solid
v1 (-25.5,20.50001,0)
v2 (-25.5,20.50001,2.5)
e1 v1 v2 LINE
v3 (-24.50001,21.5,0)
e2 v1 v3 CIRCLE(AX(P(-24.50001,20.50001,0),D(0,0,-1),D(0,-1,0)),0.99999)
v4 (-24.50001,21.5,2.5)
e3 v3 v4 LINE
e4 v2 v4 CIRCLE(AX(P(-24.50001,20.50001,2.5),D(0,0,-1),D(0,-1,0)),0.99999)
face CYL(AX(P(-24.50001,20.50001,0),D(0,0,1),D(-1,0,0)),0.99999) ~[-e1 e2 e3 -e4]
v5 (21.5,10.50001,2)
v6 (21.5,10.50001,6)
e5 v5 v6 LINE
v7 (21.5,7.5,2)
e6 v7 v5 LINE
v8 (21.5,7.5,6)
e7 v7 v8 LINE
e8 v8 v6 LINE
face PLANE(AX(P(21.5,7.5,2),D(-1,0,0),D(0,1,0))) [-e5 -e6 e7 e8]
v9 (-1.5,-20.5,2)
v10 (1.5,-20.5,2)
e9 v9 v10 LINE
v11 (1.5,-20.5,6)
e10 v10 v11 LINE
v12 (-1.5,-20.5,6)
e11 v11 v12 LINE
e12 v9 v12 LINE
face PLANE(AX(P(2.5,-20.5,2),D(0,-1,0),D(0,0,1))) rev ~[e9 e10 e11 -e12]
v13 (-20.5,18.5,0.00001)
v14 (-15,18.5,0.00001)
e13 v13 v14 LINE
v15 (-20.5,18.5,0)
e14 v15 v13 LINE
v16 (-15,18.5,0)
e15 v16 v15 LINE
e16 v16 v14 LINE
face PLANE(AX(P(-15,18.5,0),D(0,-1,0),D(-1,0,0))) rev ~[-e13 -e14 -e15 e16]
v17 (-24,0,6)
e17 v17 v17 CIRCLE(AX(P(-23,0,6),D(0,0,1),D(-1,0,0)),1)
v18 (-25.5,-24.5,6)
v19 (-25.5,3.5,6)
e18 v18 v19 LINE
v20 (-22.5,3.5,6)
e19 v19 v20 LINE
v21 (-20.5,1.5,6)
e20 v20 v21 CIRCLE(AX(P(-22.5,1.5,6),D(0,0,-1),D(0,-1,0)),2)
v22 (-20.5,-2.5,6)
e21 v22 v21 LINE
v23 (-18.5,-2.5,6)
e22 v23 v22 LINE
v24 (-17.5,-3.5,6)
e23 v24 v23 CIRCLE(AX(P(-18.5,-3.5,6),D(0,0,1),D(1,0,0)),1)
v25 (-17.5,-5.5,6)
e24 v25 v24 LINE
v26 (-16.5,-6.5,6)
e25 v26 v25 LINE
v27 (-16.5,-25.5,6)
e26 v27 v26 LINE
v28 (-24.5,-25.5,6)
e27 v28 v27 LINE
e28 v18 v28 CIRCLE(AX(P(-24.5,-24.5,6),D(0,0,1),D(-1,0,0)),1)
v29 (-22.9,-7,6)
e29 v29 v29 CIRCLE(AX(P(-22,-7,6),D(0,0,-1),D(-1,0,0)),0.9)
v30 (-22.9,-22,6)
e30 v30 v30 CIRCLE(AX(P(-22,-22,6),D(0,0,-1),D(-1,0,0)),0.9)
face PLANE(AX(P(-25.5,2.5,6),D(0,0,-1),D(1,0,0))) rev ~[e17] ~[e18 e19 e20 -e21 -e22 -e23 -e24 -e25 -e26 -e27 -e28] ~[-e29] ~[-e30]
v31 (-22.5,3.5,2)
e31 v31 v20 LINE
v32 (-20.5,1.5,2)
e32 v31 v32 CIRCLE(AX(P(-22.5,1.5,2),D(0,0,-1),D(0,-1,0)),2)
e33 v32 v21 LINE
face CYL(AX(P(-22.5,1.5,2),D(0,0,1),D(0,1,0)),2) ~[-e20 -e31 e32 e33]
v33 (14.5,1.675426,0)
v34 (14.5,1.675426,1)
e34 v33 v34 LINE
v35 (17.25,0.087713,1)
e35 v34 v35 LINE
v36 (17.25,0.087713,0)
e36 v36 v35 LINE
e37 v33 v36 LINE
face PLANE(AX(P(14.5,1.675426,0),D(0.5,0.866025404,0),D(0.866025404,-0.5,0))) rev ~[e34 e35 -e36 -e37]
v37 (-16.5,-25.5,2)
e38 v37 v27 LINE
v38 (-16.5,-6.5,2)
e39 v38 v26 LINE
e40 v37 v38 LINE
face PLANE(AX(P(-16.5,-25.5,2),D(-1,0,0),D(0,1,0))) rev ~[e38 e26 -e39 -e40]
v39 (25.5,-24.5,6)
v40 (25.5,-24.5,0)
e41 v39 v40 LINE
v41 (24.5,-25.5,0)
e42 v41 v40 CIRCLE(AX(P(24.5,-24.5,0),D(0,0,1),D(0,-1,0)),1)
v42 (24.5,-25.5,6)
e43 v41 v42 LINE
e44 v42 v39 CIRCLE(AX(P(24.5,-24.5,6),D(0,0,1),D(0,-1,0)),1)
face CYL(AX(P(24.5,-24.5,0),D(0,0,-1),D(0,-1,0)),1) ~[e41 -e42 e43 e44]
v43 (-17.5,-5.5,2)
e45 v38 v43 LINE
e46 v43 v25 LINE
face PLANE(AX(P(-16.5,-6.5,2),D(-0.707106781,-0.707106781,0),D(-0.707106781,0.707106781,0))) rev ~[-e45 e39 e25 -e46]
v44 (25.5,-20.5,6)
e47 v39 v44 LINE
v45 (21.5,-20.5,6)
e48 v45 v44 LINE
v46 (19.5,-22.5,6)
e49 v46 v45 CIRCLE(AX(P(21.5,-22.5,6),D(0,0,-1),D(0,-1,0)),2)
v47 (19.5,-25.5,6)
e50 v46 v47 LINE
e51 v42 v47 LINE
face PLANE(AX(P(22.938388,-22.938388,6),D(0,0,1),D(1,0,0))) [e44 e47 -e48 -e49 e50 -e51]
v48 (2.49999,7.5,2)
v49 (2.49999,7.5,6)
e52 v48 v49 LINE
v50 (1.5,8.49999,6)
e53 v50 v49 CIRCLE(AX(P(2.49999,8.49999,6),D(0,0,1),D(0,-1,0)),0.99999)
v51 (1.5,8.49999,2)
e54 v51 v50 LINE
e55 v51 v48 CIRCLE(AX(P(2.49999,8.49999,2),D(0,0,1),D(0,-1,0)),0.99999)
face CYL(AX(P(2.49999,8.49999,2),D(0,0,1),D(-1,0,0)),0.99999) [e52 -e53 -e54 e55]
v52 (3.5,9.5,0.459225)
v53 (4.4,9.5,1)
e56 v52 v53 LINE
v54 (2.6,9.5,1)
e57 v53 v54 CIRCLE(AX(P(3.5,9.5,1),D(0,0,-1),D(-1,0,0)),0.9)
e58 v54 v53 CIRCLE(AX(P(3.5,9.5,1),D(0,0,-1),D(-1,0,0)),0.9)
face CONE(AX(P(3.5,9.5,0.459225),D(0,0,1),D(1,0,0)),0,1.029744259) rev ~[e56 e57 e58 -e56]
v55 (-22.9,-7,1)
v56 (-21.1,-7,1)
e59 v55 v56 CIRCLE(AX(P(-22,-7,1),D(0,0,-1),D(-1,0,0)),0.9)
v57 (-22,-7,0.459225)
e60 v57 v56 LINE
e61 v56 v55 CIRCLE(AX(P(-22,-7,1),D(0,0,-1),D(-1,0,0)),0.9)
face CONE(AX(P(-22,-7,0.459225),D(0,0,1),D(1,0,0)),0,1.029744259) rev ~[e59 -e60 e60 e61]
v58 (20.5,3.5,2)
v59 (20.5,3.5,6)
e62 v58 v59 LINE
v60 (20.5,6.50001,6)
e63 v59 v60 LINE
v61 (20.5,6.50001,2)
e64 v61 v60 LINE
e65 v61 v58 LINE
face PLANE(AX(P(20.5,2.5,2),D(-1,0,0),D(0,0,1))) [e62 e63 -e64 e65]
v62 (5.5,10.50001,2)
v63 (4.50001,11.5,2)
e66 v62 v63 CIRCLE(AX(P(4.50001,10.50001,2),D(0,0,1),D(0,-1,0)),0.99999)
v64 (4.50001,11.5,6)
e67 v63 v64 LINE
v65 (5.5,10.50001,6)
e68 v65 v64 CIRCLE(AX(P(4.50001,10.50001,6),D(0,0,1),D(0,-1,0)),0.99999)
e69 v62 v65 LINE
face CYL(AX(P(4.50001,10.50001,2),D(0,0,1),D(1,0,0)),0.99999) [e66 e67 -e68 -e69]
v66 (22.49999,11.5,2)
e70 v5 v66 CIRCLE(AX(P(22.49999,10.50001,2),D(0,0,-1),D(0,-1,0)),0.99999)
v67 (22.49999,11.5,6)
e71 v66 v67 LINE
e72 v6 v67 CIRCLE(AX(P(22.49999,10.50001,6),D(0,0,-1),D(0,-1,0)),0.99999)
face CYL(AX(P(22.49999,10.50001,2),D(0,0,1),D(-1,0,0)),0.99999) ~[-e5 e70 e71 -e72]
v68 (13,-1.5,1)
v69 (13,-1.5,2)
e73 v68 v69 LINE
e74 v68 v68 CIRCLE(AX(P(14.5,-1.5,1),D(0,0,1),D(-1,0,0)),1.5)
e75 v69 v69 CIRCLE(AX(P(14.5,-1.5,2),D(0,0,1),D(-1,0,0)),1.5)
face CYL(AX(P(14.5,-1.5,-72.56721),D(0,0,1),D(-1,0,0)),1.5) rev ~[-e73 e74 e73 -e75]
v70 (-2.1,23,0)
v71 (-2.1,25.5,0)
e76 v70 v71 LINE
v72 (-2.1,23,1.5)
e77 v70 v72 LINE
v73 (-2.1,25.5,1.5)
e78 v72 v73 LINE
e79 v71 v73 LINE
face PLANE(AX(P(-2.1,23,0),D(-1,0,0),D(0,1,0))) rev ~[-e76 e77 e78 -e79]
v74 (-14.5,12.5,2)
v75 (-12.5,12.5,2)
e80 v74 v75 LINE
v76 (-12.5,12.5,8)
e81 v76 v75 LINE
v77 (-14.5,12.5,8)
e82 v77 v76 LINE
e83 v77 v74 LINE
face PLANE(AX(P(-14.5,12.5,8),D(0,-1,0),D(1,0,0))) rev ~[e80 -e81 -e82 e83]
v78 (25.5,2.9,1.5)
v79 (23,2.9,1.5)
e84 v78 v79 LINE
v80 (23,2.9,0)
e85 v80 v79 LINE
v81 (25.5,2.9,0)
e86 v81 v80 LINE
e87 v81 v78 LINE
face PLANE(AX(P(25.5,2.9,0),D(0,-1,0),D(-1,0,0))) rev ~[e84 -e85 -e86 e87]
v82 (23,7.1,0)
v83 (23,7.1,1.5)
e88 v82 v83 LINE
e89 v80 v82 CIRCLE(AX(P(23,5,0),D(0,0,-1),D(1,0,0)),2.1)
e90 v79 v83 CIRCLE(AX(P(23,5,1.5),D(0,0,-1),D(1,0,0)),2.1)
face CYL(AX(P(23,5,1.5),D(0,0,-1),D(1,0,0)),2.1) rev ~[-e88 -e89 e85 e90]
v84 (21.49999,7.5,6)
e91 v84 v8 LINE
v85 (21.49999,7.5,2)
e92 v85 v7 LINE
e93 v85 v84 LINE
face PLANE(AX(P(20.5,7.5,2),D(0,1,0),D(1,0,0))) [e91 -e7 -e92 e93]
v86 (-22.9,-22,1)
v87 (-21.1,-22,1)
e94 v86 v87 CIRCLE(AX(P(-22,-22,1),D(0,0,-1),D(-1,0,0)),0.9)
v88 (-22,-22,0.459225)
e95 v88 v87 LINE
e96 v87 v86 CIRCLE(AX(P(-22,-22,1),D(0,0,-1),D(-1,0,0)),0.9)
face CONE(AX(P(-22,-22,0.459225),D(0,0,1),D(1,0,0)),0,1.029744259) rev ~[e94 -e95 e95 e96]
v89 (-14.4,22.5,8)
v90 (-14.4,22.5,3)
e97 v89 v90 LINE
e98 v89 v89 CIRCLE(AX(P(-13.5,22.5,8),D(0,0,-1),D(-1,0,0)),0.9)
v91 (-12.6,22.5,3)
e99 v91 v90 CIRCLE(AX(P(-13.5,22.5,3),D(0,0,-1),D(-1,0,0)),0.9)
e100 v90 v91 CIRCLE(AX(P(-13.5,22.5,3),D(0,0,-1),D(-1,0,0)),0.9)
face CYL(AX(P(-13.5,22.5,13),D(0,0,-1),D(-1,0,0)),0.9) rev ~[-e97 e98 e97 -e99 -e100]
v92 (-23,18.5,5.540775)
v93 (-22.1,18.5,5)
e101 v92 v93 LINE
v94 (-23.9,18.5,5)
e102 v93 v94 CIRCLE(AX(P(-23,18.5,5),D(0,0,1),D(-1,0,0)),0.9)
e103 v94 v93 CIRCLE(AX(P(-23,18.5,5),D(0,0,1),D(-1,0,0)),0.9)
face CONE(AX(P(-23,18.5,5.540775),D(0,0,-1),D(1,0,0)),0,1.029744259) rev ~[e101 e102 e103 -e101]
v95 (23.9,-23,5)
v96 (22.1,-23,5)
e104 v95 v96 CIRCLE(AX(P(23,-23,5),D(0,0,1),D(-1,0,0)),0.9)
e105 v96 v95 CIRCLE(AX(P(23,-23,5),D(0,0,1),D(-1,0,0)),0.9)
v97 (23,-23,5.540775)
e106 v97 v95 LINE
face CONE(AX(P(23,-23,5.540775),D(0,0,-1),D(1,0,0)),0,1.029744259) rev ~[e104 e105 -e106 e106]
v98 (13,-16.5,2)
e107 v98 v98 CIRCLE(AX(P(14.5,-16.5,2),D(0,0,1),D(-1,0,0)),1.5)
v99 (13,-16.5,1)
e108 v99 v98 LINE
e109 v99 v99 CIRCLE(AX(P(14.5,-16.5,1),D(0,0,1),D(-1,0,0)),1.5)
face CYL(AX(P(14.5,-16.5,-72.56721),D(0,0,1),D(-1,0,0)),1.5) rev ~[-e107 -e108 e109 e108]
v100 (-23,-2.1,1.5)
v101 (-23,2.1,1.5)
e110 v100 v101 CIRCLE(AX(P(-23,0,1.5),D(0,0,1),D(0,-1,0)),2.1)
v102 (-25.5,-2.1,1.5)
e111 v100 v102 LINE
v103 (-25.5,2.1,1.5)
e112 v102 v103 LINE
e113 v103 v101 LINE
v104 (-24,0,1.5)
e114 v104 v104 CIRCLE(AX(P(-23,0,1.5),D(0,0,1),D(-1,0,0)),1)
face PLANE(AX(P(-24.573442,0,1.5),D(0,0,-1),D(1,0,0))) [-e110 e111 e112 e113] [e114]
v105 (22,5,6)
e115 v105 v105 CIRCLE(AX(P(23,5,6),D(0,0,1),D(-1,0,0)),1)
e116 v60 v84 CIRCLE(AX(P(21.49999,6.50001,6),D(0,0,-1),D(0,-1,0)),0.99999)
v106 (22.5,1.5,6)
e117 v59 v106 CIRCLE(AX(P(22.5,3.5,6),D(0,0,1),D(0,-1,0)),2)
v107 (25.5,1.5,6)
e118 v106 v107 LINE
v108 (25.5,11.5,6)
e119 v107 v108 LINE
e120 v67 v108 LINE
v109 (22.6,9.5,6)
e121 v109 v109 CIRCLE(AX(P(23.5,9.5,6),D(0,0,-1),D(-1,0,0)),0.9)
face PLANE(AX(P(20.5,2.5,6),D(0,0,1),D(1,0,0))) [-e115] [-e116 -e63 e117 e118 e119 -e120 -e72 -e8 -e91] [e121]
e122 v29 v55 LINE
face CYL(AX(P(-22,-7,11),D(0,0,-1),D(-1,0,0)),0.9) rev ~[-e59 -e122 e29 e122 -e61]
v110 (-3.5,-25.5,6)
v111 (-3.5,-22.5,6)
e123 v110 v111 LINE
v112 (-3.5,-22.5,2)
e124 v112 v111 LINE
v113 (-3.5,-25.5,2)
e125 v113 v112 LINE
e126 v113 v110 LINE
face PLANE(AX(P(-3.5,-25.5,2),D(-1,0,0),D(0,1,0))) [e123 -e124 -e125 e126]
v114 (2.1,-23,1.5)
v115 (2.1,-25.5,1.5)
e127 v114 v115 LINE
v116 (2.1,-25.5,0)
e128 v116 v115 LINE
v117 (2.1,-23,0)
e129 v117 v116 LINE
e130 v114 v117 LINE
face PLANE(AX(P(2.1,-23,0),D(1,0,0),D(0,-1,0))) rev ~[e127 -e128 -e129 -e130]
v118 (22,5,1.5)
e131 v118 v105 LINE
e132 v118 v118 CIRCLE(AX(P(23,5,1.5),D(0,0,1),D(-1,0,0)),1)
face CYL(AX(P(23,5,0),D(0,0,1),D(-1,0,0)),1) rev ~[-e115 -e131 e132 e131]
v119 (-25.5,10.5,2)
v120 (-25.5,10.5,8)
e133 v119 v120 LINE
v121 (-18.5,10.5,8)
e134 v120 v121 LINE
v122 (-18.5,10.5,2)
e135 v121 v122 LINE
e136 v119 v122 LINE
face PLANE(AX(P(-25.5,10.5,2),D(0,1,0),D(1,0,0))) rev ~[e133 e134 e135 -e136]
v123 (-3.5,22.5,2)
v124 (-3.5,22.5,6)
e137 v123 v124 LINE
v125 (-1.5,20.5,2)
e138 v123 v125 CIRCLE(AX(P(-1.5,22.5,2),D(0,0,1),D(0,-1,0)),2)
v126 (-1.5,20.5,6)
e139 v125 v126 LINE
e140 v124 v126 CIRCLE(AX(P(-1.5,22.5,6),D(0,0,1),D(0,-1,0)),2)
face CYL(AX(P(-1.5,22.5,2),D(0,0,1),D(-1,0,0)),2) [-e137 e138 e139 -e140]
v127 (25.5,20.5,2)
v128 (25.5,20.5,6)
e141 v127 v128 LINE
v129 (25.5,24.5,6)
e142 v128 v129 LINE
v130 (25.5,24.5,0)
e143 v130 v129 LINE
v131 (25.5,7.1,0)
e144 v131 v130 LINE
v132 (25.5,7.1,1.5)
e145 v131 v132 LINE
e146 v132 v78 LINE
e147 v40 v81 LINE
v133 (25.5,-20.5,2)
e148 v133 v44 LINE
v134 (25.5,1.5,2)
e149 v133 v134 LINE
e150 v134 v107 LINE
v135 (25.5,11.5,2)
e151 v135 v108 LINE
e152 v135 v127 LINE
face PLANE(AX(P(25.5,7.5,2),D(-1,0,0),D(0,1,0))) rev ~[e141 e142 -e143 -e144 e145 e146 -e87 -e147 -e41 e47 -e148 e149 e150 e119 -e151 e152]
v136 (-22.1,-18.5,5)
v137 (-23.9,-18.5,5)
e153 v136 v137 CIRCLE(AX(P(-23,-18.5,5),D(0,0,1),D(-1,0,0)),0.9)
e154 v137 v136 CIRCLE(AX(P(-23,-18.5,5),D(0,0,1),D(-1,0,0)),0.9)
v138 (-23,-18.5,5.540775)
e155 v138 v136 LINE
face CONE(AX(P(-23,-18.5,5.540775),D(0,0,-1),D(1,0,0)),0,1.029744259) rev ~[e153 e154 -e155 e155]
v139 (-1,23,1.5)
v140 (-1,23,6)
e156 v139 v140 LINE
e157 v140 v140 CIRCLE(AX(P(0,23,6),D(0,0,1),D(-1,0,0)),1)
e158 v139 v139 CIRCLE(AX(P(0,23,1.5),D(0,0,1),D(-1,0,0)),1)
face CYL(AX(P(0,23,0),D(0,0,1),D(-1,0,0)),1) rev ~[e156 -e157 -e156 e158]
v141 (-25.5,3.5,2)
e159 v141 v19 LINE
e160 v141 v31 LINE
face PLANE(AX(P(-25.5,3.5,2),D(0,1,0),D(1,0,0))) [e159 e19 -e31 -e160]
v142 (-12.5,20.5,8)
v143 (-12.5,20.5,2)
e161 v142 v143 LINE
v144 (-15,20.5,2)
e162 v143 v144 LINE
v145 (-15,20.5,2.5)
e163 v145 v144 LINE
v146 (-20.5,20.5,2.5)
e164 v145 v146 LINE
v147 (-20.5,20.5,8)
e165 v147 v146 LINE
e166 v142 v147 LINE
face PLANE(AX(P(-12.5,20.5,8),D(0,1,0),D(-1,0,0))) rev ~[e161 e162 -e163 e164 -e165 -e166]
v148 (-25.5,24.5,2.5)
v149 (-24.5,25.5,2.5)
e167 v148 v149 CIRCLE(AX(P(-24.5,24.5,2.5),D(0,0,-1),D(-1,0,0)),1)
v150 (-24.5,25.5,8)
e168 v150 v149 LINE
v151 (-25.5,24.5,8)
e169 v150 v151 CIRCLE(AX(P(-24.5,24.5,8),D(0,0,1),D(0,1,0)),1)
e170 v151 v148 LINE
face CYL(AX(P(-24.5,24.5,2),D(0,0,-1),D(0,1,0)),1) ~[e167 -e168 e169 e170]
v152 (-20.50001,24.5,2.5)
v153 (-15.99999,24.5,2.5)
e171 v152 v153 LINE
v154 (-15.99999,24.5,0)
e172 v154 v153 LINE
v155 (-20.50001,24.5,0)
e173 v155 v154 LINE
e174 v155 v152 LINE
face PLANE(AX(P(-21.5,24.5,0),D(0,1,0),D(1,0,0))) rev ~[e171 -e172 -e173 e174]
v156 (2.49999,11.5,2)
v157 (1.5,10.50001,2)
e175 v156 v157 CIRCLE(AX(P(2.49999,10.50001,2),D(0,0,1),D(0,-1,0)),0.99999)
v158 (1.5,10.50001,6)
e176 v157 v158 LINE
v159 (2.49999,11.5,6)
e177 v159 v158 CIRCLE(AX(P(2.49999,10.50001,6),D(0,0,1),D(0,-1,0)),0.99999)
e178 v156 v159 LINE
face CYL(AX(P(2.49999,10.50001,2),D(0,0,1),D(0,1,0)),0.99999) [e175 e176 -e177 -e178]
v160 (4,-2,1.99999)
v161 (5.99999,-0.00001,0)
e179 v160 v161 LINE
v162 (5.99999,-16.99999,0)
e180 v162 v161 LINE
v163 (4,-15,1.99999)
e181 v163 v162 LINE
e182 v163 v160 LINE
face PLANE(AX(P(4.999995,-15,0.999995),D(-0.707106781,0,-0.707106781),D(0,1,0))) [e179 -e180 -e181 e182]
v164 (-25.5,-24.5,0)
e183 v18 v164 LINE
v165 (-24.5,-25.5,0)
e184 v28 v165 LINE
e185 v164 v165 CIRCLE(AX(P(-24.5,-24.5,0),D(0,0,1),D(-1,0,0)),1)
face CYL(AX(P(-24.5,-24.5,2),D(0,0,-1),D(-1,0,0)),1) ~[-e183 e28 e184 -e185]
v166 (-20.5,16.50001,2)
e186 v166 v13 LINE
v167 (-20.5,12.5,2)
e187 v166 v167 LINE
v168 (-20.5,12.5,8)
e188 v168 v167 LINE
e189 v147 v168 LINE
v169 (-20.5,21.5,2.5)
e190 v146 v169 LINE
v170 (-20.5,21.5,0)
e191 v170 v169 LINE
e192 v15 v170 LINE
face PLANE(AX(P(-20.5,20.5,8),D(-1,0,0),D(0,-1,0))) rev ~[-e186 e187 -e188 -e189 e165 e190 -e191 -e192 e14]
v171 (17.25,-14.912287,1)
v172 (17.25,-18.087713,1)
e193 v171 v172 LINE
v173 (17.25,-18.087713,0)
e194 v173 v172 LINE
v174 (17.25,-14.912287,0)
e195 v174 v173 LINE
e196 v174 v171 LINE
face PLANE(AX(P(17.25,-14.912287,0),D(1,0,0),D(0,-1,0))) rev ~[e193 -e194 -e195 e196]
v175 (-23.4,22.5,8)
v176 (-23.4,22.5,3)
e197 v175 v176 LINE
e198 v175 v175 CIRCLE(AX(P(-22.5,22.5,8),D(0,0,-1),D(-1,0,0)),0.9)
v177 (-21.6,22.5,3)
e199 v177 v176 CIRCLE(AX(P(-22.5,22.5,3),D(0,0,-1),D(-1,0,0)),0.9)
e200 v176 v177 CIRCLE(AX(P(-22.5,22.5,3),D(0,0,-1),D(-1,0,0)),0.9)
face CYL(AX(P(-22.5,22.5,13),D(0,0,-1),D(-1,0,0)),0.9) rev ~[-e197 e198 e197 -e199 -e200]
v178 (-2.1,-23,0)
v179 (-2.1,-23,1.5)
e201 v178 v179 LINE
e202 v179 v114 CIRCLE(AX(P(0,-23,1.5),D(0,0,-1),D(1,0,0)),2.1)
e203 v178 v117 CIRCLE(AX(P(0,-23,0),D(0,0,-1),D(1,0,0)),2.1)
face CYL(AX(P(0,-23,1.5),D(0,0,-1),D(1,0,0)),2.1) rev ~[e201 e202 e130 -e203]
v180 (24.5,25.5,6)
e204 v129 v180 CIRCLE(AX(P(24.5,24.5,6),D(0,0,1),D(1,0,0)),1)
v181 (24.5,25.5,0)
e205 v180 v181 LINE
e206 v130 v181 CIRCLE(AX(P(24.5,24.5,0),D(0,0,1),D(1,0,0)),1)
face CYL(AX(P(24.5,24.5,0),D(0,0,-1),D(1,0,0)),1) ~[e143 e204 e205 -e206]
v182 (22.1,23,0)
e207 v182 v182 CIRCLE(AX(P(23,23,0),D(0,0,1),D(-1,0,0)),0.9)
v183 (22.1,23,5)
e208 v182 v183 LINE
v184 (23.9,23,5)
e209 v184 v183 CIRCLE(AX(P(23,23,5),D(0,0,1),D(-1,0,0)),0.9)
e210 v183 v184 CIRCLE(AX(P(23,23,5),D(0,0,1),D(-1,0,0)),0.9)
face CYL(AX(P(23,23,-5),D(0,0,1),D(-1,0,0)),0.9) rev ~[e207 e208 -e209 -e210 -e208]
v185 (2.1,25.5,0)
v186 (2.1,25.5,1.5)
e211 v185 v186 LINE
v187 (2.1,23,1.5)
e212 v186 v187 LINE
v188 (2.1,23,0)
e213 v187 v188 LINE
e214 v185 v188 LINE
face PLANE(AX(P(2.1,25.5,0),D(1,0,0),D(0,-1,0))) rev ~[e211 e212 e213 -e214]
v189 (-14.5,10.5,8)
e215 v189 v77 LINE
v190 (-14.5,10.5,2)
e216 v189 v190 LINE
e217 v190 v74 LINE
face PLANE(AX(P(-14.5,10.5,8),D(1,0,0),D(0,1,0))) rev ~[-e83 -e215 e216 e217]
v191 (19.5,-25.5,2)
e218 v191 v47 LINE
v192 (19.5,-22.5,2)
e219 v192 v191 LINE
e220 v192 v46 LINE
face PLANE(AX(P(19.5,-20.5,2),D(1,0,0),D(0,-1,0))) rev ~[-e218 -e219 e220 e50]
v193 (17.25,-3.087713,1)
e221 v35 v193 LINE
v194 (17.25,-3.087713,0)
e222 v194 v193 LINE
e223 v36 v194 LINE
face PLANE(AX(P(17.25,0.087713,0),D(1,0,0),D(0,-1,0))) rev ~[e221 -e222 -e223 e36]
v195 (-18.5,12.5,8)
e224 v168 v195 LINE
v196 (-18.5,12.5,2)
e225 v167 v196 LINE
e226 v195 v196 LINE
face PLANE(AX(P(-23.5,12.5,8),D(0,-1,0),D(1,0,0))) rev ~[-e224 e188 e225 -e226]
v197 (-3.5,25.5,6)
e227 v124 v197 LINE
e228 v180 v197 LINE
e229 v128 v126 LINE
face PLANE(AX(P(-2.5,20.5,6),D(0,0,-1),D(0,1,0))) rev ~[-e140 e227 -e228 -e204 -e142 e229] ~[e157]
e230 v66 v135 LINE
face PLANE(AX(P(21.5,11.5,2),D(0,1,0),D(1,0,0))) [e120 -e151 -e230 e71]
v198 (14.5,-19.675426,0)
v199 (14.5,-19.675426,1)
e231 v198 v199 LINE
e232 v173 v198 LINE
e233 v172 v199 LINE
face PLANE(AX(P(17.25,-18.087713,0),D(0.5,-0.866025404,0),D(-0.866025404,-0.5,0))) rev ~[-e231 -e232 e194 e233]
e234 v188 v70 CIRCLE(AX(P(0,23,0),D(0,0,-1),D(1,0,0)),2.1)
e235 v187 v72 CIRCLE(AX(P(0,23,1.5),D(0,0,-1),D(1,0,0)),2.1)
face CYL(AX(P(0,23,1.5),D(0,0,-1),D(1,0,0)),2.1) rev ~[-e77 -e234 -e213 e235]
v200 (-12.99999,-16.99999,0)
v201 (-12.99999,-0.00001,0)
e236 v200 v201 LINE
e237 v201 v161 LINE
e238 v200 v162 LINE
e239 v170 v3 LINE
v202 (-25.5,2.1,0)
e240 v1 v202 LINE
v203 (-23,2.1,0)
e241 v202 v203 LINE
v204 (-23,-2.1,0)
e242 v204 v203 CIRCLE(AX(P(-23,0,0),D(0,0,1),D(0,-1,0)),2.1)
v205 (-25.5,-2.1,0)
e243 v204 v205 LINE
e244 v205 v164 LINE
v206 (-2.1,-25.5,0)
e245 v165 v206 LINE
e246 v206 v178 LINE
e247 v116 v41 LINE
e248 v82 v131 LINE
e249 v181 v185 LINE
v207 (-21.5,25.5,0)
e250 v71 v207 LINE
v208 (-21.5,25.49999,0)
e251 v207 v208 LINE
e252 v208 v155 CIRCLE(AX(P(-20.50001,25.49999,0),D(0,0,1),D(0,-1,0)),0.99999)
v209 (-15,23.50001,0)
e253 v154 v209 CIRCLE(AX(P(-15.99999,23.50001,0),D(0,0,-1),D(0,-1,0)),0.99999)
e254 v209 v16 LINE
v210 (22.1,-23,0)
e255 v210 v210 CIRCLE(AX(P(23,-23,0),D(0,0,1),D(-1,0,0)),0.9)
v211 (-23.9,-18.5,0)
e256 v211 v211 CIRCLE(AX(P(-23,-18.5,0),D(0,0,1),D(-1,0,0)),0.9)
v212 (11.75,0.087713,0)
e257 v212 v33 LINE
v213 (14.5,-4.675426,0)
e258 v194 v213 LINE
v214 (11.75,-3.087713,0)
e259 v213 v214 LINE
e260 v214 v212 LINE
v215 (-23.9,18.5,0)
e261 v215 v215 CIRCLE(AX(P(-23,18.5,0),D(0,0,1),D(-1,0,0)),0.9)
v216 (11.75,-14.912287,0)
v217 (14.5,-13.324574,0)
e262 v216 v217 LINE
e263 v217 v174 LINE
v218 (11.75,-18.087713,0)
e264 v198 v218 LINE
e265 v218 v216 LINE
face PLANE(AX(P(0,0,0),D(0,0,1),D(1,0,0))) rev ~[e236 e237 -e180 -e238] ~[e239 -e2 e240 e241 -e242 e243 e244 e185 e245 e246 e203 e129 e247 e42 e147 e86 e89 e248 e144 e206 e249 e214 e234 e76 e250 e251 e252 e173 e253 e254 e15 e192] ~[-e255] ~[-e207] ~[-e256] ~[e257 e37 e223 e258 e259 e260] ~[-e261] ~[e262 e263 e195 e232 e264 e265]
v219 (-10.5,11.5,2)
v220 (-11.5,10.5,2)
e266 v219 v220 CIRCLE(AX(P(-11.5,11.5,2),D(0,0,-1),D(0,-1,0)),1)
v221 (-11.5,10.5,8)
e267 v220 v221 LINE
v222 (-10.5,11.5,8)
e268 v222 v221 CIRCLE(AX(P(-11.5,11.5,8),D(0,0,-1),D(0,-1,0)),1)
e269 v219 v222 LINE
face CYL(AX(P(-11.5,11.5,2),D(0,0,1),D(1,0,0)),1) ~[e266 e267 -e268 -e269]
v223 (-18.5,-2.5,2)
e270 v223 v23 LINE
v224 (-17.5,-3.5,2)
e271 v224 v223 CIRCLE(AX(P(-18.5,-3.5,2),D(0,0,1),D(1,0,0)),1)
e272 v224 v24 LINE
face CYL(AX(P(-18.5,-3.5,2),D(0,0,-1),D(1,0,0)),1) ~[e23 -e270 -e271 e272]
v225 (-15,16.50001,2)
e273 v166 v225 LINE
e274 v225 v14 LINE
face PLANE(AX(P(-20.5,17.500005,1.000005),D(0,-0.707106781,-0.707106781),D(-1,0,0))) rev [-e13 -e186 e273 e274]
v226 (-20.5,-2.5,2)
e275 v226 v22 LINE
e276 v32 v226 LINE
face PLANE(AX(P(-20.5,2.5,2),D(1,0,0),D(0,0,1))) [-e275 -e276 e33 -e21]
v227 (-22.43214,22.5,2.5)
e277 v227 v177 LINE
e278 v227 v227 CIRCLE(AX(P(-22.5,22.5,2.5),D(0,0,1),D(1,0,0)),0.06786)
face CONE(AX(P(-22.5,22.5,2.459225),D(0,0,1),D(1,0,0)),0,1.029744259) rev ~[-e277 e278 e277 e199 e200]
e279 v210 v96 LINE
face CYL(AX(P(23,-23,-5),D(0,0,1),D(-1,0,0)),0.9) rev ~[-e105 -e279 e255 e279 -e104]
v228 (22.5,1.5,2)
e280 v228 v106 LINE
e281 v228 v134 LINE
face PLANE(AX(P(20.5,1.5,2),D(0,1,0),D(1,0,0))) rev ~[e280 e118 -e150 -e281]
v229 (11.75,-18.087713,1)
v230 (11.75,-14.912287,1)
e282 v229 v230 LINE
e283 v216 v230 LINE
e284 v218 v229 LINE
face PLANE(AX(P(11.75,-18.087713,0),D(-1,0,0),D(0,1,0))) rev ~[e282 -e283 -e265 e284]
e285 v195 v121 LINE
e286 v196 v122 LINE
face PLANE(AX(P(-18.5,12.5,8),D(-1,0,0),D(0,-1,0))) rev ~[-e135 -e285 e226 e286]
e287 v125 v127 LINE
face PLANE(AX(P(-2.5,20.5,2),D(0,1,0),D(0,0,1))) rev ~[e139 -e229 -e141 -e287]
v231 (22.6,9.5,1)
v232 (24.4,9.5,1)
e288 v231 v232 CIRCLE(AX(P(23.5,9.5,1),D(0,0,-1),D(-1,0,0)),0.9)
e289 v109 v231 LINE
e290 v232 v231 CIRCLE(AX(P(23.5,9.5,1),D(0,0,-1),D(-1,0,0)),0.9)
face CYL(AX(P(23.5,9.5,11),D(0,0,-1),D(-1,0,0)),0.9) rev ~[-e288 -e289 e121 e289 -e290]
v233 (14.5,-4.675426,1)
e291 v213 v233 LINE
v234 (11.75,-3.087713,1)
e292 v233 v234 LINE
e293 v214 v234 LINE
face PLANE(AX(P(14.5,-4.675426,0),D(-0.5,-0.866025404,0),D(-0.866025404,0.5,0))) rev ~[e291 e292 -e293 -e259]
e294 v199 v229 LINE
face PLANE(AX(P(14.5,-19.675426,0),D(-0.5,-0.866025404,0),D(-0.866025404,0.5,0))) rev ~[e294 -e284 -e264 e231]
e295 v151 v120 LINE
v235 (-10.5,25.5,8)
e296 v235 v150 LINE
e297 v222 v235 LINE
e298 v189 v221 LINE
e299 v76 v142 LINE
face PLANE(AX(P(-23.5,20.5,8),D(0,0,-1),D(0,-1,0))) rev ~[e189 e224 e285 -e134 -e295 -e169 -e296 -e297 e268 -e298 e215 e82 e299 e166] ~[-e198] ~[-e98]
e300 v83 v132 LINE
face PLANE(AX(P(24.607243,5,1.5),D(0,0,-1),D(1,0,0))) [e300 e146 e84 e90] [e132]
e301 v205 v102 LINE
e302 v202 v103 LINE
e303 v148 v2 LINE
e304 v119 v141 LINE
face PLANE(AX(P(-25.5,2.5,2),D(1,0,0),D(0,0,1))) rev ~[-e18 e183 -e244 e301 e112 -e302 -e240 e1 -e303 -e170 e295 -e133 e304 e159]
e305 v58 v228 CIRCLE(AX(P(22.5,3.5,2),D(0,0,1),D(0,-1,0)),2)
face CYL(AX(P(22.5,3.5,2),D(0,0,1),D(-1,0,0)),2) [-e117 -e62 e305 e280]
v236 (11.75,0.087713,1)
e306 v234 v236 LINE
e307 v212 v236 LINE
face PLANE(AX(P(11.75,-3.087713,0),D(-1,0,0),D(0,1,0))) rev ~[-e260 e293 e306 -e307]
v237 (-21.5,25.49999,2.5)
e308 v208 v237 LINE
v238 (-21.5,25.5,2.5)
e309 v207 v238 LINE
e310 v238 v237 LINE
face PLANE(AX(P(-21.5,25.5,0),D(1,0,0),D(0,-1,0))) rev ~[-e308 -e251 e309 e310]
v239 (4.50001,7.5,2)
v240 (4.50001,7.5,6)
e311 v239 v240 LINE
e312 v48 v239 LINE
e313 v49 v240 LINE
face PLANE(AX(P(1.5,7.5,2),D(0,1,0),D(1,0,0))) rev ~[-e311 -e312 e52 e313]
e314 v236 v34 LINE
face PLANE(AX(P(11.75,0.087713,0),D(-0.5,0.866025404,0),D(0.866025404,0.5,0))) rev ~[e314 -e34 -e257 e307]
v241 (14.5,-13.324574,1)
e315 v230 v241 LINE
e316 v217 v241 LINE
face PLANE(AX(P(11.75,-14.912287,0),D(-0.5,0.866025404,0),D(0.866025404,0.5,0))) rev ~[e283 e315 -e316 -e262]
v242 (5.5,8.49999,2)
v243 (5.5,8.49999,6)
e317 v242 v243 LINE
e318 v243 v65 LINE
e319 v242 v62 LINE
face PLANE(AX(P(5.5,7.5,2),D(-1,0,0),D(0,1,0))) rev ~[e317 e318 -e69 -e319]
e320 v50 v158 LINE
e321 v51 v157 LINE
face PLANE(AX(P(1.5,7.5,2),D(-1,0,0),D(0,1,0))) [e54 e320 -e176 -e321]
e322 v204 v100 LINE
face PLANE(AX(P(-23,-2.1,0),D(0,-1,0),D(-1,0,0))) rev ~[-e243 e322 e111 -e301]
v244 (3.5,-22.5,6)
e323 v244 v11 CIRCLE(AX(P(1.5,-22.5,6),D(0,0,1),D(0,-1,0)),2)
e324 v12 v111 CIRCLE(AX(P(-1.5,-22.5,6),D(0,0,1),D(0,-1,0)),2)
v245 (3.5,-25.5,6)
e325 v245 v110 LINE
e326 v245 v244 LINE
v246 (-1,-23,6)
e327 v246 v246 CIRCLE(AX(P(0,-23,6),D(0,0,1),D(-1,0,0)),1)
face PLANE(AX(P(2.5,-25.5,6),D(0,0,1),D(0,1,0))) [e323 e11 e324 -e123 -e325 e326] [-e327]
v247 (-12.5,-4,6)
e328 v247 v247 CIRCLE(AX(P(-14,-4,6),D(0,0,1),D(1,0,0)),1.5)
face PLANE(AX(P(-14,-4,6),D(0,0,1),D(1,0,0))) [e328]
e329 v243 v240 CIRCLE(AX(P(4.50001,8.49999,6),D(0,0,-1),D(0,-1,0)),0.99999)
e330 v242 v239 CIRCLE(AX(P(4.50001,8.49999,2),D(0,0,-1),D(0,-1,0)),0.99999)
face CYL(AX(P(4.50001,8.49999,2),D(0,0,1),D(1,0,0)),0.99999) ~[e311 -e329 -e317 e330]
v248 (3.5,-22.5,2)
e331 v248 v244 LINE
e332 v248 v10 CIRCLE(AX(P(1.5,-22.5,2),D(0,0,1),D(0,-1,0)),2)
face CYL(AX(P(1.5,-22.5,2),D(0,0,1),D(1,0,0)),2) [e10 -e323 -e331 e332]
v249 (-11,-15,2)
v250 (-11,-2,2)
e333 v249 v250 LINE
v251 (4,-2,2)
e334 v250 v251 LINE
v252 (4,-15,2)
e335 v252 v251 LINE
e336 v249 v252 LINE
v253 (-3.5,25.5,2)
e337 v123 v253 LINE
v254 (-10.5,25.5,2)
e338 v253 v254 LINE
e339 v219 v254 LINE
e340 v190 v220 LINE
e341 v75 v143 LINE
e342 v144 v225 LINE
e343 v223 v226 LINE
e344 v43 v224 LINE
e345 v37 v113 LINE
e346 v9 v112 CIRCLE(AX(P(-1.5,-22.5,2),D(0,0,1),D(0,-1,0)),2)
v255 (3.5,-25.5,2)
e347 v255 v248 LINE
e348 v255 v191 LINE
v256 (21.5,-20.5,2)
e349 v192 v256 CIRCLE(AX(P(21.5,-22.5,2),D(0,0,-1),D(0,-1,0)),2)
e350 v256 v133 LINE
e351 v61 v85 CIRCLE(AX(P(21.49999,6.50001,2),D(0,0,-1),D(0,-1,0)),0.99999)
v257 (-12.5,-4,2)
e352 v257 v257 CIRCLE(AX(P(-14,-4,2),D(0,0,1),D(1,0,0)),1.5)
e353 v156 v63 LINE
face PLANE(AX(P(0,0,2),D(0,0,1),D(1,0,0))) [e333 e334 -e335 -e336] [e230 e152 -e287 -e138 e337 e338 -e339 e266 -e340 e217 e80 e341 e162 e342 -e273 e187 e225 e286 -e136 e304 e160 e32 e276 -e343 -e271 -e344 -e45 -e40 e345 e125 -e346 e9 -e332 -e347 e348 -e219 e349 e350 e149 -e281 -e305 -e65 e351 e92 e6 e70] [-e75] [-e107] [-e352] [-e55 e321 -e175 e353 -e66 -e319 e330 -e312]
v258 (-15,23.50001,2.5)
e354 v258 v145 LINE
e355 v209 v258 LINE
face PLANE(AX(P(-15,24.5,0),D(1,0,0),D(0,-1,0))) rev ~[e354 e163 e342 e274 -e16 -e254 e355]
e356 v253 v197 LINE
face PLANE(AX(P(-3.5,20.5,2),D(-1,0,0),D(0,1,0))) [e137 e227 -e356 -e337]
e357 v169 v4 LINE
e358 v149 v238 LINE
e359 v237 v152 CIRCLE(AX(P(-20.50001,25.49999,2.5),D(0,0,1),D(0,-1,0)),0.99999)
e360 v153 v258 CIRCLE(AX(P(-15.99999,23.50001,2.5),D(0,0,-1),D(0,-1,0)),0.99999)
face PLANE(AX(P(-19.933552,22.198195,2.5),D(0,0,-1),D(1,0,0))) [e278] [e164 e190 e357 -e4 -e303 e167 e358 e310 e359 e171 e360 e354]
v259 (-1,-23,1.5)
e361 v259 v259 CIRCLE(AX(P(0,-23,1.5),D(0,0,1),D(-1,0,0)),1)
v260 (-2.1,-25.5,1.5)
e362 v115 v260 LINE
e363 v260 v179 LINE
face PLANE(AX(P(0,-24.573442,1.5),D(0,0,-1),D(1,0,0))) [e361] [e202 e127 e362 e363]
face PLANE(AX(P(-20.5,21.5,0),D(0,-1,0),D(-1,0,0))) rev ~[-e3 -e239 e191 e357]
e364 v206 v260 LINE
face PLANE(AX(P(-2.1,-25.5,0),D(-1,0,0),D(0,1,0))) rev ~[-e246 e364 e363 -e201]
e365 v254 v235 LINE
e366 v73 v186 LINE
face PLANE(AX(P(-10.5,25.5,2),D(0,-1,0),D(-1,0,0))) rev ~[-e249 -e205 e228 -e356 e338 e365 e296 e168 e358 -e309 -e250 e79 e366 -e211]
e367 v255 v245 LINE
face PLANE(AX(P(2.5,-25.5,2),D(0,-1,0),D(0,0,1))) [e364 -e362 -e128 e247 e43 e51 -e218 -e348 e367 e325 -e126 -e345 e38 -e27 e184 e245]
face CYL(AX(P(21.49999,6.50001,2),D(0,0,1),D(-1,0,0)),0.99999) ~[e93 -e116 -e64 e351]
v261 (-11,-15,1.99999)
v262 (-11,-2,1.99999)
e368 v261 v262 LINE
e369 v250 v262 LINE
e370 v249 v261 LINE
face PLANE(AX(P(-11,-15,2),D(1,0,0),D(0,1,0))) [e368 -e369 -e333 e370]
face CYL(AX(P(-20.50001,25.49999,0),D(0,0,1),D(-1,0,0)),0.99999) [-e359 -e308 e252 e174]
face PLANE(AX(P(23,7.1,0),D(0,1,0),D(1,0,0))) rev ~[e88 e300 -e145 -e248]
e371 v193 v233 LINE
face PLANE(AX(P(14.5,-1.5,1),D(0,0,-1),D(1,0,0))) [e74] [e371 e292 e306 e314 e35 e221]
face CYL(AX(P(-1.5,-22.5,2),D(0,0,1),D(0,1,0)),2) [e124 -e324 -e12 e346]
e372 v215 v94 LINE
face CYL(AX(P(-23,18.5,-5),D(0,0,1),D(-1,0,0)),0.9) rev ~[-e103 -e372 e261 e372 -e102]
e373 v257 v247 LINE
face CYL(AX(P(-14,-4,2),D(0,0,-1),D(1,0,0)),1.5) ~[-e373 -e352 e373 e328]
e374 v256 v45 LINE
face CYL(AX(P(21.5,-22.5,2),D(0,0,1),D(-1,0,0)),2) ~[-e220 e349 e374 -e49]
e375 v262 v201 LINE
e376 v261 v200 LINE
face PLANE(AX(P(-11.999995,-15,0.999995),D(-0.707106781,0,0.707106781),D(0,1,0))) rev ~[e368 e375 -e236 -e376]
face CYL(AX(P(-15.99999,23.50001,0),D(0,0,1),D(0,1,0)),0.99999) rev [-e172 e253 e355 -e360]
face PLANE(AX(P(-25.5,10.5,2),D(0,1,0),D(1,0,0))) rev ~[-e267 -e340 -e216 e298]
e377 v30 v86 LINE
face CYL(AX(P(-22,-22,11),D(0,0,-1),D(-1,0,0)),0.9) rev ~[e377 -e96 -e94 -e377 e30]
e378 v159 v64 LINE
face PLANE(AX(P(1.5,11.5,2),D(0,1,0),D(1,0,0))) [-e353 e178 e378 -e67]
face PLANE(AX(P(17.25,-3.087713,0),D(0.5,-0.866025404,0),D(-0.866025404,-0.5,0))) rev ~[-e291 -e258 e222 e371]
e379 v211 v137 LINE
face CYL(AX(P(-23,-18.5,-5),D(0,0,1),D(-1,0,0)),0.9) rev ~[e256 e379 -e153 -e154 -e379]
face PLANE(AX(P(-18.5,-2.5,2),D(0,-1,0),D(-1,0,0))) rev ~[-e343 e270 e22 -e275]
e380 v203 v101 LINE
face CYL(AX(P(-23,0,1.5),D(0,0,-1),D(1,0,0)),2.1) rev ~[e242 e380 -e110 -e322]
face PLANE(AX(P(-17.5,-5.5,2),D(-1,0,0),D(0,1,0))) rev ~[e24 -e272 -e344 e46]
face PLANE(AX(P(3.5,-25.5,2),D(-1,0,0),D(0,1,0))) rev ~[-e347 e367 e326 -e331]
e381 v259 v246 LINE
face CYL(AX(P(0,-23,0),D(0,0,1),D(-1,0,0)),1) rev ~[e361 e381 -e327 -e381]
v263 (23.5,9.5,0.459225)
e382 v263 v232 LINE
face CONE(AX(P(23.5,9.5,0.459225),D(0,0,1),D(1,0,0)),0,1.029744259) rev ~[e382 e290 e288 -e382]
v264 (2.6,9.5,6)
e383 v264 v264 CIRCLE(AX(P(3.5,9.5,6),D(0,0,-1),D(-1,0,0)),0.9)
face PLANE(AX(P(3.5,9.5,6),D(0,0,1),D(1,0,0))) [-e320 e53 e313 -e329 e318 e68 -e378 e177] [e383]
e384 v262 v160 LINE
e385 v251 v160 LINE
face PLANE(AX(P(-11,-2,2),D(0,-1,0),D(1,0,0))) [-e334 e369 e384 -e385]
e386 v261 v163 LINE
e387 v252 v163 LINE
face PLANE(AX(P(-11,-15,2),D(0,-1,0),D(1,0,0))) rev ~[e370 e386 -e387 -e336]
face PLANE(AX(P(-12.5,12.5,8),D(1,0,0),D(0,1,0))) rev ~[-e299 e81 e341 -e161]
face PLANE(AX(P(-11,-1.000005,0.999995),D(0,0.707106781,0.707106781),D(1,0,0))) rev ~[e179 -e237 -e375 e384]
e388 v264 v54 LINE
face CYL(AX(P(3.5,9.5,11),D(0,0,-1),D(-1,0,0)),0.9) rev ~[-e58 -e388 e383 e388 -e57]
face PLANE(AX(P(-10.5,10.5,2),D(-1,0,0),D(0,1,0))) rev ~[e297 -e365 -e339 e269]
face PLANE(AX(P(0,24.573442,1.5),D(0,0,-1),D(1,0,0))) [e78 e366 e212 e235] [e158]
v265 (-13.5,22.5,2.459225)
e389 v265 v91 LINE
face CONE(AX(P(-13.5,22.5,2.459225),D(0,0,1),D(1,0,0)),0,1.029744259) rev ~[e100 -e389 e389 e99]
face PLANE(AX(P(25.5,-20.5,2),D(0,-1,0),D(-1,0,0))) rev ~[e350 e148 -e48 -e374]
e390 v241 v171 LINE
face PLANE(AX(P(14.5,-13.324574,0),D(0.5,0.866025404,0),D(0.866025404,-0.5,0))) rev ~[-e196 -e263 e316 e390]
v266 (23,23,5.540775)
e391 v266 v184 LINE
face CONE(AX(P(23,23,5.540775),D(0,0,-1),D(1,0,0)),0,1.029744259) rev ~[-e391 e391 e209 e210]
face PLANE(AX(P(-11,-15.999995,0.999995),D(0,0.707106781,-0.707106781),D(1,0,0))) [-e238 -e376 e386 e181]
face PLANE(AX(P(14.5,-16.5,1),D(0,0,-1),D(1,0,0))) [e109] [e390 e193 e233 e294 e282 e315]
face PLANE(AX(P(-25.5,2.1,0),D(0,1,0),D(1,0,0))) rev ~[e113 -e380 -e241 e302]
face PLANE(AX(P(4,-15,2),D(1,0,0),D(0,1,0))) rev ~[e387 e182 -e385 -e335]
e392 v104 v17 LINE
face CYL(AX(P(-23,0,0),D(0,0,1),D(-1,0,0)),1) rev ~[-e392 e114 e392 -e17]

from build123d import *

# Parameters (mm, degrees)
F1_DEPTH         = 2
F2_W             = 5
F2_H             = 5
F3_DEPTH         = 4
F4_DEPTH         = 6
F5_R             = 1
F7_D             = 2
F7_CBORE_D       = 4.2
F7_CBORE_DEPTH   = 1.5
F2_W_2           = 15
F2_H_2           = 13
F8_DEPTH         = 25
F9_SIZE          = 1.99999
F10_R            = 1.5
F11_DEPTH        = 4
F14_DEPTH        = 6
F16_DEPTH        = 1.5
F18_DEPTH        = 1
F19_D            = 3
F20_W            = 4
F20_H            = 4
F21_DEPTH        = 4
F22_R            = 0.99999
F24_D            = 1.8
F24_DEPTH        = 5
F24_TIP          = 0.5407745571
F24_ON_F13_D     = 1.8
F24_ON_F13_DEPTH = 5
F24_ON_F13_TIP   = 0.5407745571
F24_ON_F23_D     = 1.8
F24_ON_F23_DEPTH = 5
F24_ON_F23_TIP   = 0.5407745571
F25_DEPTH        = 3
F27_DEPTH        = 2.5
F28_SIZE         = 1.99999
F29_R            = 0.99999
F30_DEPTH        = 1
F31_DEPTH        = 1
F32_DEPTH        = 1
F33_DEPTH        = 1
F34_R            = 2
F36_D            = 1.8
F36_DEPTH        = 5
F36_TIP          = 0.5407745571


# Not quite as in the source:
# - a fillet or chamfer is up to 0.001 mm smaller than in the source, because OpenCascade refuses the exact size
# - a feature names something its author has since deleted; it is built from what else it names


with BuildPart() as f1:
    # F0 (on Top) → F1 (new body)
    with BuildSketch(Plane.XY):
        with BuildLine():
            Line((-24.5, -25.5), (24.5, -25.5))
            ThreePointArc((24.5, -25.5), (25.2071067812, -25.2071067812), (25.5, -24.5))
            Line((25.5, -24.5), (25.5, 24.5))
            ThreePointArc((25.5, 24.5), (25.2071067812, 25.2071067812), (24.5, 25.5))
            Line((24.5, 25.5), (-24.5, 25.5))
            ThreePointArc((-24.5, 25.5), (-25.2071067812, 25.2071067812), (-25.5, 24.5))
            Line((-25.5, 24.5), (-25.5, -24.5))
            ThreePointArc((-25.5, -24.5), (-25.2071067812, -25.2071067812), (-24.5, -25.5))
        make_face()
    extrude(amount=F1_DEPTH)

    # F2 (on face) → F3 (join)
    with BuildSketch(Plane.XY.offset(2)):
        with Locations((-23, 0)):
            Rectangle(F2_W, F2_H)
        with Locations((0, 23)):
            Rectangle(F2_W, F2_H)
        with Locations((23, 5)):
            Rectangle(F2_W, F2_H)
        with Locations((0, -23)):
            Rectangle(F2_W, F2_H)
    extrude(amount=F3_DEPTH)

    # F2 (on face) → F4 (join)
    with BuildSketch(Plane.XY.offset(2)):
        with BuildLine():
            Line((-25.5, 24.5), (-25.5, 10.5))
            Line((-25.5, 10.5), (-10.5, 10.5))
            Line((-10.5, 10.5), (-10.5, 25.5))
            Line((-10.5, 25.5), (-24.5, 25.5))
            ThreePointArc((-24.5, 25.5), (-25.2071067812, 25.2071067812), (-25.5, 24.5))
        make_face()
    extrude(amount=F4_DEPTH)

    # F5
    f5_edges = [f1.edges().sort_by_distance(p)[0] for p in [
        (-10.5, 10.5, 5),
    ]]
    fillet(f5_edges, radius=F5_R)

    # F7 (through all)
    with Locations(Plane(origin=(0, 0, 0), x_dir=(1, 0, 0), z_dir=(0, 0, -1))):
        with Locations((-23, 0), (0, 23), (23, -5), (0, -23)):
            CounterBoreHole(F7_D / 2, F7_CBORE_D / 2, F7_CBORE_DEPTH)

    # F2 (on face) → F8 (cut)
    with BuildSketch(Plane.XY.offset(2)):
        with Locations((-3.5, -8.5)):
            Rectangle(F2_W_2, F2_H_2)
    extrude(amount=-F8_DEPTH, mode=Mode.SUBTRACT)

    # F9 (size 2 in the source; OpenCascade refuses exactly that, so slightly less here)
    f9_edges = [f1.edges().sort_by_distance(p)[0] for p in [
        (-11, -8.5, 0),
        (-3.5, -15, 0),
        (4, -8.5, 0),
        (-3.5, -2, 0),
    ]]
    chamfer(f9_edges, length=F9_SIZE)

    # F10 (on face) → F11 (join)
    with BuildSketch(Plane.XY.offset(2)):
        with BuildLine():
            Line((-24.5, -25.5), (-16.5, -25.5))
            Line((-16.5, -25.5), (-16.5, -6.5))
            Line((-16.5, -6.5), (-17.5, -5.5))
            Line((-17.5, -5.5), (-17.5, -3.5))
            ThreePointArc((-17.5, -3.5), (-17.7928932188, -2.7928932188), (-18.5, -2.5))
            Line((-18.5, -2.5), (-20.5, -2.5))
            Line((-20.5, -2.5), (-25.5, -2.5))
            Line((-25.5, -2.5), (-25.5, -24.5))
            ThreePointArc((-25.5, -24.5), (-25.2071067812, -25.2071067812), (-24.5, -25.5))
        make_face()
        with Locations((-14, -4)):
            Circle(F10_R)
    extrude(amount=F11_DEPTH)

    # F13 (on face) → F14 (cut)
    with BuildSketch(Plane.XY.offset(8)):
        Polygon((-14.5, 12.5), (-12.5, 12.5), (-12.5, 20.5), (-23.5, 20.5), (-23.5, 12.5), (-18.5, 12.5), (-18.5, 10.5), (-14.5, 10.5), align=None)
    extrude(amount=-F14_DEPTH, mode=Mode.SUBTRACT)

    # F15 (on face) → F16 (cut)
    with BuildSketch(Plane(origin=(0, 0, 0), x_dir=(1, 0, 0), z_dir=(0, 0, -1))):
        with BuildLine():
            ThreePointArc((-2.1, 23), (0, 25.1), (2.1, 23))
            Line((2.1, 23), (2.1, 25.5))
            Line((2.1, 25.5), (-2.1, 25.5))
            Line((-2.1, 25.5), (-2.1, 23))
        make_face()
        with BuildLine():
            Line((25.5, -7.1), (25.5, -2.9))
            Line((25.5, -2.9), (23, -2.9))
            ThreePointArc((23, -2.9), (24.4849242405, -3.5150757595), (25.1, -5))
            ThreePointArc((25.1, -5), (24.4849242405, -6.4849242405), (23, -7.1))
            Line((23, -7.1), (25.5, -7.1))
        make_face()
        with BuildLine():
            Line((-23, 2.1), (-25.5, 2.1))
            Line((-25.5, 2.1), (-25.5, -2.1))
            Line((-25.5, -2.1), (-23, -2.1))
            ThreePointArc((-23, -2.1), (-25.1, 0), (-23, 2.1))
        make_face()
        with BuildLine():
            Line((-2.1, -25.5), (2.1, -25.5))
            Line((2.1, -25.5), (2.1, -23))
            ThreePointArc((2.1, -23), (0, -25.1), (-2.1, -23))
            Line((-2.1, -23), (-2.1, -25.5))
        make_face()
    extrude(amount=-F16_DEPTH, mode=Mode.SUBTRACT)

    # F17 (on face) → F18 (cut)
    with BuildSketch(Plane(origin=(0, 0, 0), x_dir=(1, 0, 0), z_dir=(0, 0, -1))):
        Polygon((17.25, 18.0877132403), (14.5, 19.6754264805), (11.75, 18.0877132403), (11.75, 14.9122867597), (14.5, 13.3245735195), (17.25, 14.9122867597), align=None)
        Polygon((17.25, -0.0877132403), (17.25, 3.0877132403), (14.5, 4.6754264805), (11.75, 3.0877132403), (11.75, -0.0877132403), (14.5, -1.6754264805), align=None)
    extrude(amount=-F18_DEPTH, mode=Mode.SUBTRACT)

    # F19 (through all)
    with Locations(Plane(origin=(0, 0, 0), x_dir=(1, 0, 0), z_dir=(0, 0, -1))):
        with Locations((14.5, 16.5), (14.5, 1.5)):
            Hole(F19_D / 2)

    # F20 (on face) → F21 (join)
    with BuildSketch(Plane.XY.offset(2)):
        with Locations((23.5, 9.5)):
            Rectangle(F20_W, F20_H)
        with Locations((3.5, 9.5)):
            Rectangle(F20_W, F20_H)
        with BuildLine():
            Line((2.5, 20.5), (25.5, 20.5))
            Line((25.5, 20.5), (25.5, 24.5))
            ThreePointArc((25.5, 24.5), (25.2071067812, 25.2071067812), (24.5, 25.5))
            Line((24.5, 25.5), (2.5, 25.5))
            Line((2.5, 25.5), (2.5, 20.5))
        make_face()
        with BuildLine():
            Line((25.5, -24.5), (25.5, -20.5))
            Line((25.5, -20.5), (20.5, -20.5))
            Line((20.5, -20.5), (20.5, -25.5))
            Line((20.5, -25.5), (24.5, -25.5))
            ThreePointArc((24.5, -25.5), (25.2071067812, -25.2071067812), (25.5, -24.5))
        make_face()
    extrude(amount=F21_DEPTH)

    # F22 (radius 1 in the source; OpenCascade refuses exactly that, so slightly less here)
    f22_edges = [f1.edges().sort_by_distance(p)[0] for p in [
        (5.5, 7.5, 4),
        (1.5, 7.5, 4),
        (1.5, 11.5, 4),
        (20.5, 7.5, 4),
        (5.5, 11.5, 4),
        (21.5, 11.5, 4),
    ]]
    fillet(f22_edges, radius=F22_R)

    # F24
    with Locations(Plane.XY.offset(6)):
        with Locations((-22, -22), (-22, -7)):
            Hole(F24_D / 2, depth=F24_DEPTH)
            with Locations((0, 0, -(F24_DEPTH + F24_TIP / 2))):  # 118° drill point
                Cone(0, F24_D / 2, F24_TIP, mode=Mode.SUBTRACT)

    # F24 on F13
    with Locations(Plane.XY.offset(8)):
        with Locations((-22.5, 22.5), (-13.5, 22.5)):
            Hole(F24_ON_F13_D / 2, depth=F24_ON_F13_DEPTH)
            with Locations((0, 0, -(F24_ON_F13_DEPTH + F24_ON_F13_TIP / 2))):  # 118° drill point
                Cone(0, F24_ON_F13_D / 2, F24_ON_F13_TIP, mode=Mode.SUBTRACT)

    # F24 on F23
    with Locations(Plane.XY.offset(6)):
        with Locations((3.5, 9.5), (23.5, 9.5)):
            Hole(F24_ON_F23_D / 2, depth=F24_ON_F23_DEPTH)
            with Locations((0, 0, -(F24_ON_F23_DEPTH + F24_ON_F23_TIP / 2))):  # 118° drill point
                Cone(0, F24_ON_F23_D / 2, F24_ON_F23_TIP, mode=Mode.SUBTRACT)

    # F25 (add): a face of the model
    f25_faces = [f1.faces().sort_by_distance(p)[0] for p in [
        (-23.5, 16.5, 5),
    ]]
    extrude(f25_faces, amount=F25_DEPTH)

    # F26 (on face) → F27 (cut)
    with BuildSketch(Plane(origin=(0, 0, 0), x_dir=(1, 0, 0), z_dir=(0, 0, -1))):
        with BuildLine():
            Line((-20.5, -21.5), (-21.5, -21.5))
            Line((-21.5, -21.5), (-25.5, -21.5))
            Line((-25.5, -21.5), (-25.5, -24.5))
            ThreePointArc((-25.5, -24.5), (-25.2071067812, -25.2071067812), (-24.5, -25.5))
            Line((-24.5, -25.5), (-21.5, -25.5))
            Line((-21.5, -25.5), (-21.5, -24.5))
            Line((-21.5, -24.5), (-15, -24.5))
            Line((-15, -24.5), (-15, -21))
            Line((-15, -21), (-15, -18.5))
            Line((-15, -18.5), (-20.5, -18.5))
            Line((-20.5, -18.5), (-20.5, -21.5))
        make_face()
    extrude(amount=-F27_DEPTH, mode=Mode.SUBTRACT)

    # F28 (size 2 in the source; OpenCascade refuses exactly that, so slightly less here)
    f28_edges = [f1.edges().sort_by_distance(p)[0] for p in [
        (-17.75, 18.5, 2),
    ]]
    chamfer(f28_edges, length=F28_SIZE)

    # F29 (radius 1 in the source; OpenCascade refuses exactly that, so slightly less here)
    f29_edges = [f1.edges().sort_by_distance(p)[0] for p in [
        (-25.5, 21.5, 1.25),
        (-21.5, 24.5, 1.25),
        (-15, 24.5, 1.25),
    ]]
    fillet(f29_edges, radius=F29_R)

    # F30 (add): faces of the model
    f30_faces = [f1.faces().sort_by_distance(p)[0] for p in [
        (-2.5, 23, 4),
        (-2.5, -23, 4),
        (20.5, -23, 4),
    ]]
    extrude(f30_faces, amount=F30_DEPTH)

    # F31 (add): a face of the model
    f31_faces = [f1.faces().sort_by_distance(p)[0] for p in [
        (2.5, -23, 4),
    ]]
    extrude(f31_faces, amount=F31_DEPTH)

    # F32 (add): a face of the model
    f32_faces = [f1.faces().sort_by_distance(p)[0] for p in [
        (23, 2.5, 4),
    ]]
    extrude(f32_faces, amount=F32_DEPTH)

    # F33 (add): a face of the model
    f33_faces = [f1.faces().sort_by_distance(p)[0] for p in [
        (-23, 2.5, 4),
    ]]
    extrude(f33_faces, amount=F33_DEPTH)

    # F34
    f34_edges = [f1.edges().sort_by_distance(p)[0] for p in [
        (19.5, -20.5, 4),
        (20.5, 1.5, 4),
        (3.5, -20.5, 4),
        (-3.5, -20.5, 4),
        (-3.5, 20.5, 4),
        (-20.5, 3.5, 4),
    ]]
    fillet(f34_edges, radius=F34_R)

    # F36
    with Locations(Plane(origin=(0, 0, 0), x_dir=(1, 0, 0), z_dir=(0, 0, -1))):
        with Locations((-23, -18.5), (-23, 18.5), (23, -23), (23, 23)):
            Hole(F36_D / 2, depth=F36_DEPTH)
            with Locations((0, 0, -(F36_DEPTH + F36_TIP / 2))):  # 118° drill point
                Cone(0, F36_D / 2, F36_TIP, mode=Mode.SUBTRACT)


solid = f1.part
